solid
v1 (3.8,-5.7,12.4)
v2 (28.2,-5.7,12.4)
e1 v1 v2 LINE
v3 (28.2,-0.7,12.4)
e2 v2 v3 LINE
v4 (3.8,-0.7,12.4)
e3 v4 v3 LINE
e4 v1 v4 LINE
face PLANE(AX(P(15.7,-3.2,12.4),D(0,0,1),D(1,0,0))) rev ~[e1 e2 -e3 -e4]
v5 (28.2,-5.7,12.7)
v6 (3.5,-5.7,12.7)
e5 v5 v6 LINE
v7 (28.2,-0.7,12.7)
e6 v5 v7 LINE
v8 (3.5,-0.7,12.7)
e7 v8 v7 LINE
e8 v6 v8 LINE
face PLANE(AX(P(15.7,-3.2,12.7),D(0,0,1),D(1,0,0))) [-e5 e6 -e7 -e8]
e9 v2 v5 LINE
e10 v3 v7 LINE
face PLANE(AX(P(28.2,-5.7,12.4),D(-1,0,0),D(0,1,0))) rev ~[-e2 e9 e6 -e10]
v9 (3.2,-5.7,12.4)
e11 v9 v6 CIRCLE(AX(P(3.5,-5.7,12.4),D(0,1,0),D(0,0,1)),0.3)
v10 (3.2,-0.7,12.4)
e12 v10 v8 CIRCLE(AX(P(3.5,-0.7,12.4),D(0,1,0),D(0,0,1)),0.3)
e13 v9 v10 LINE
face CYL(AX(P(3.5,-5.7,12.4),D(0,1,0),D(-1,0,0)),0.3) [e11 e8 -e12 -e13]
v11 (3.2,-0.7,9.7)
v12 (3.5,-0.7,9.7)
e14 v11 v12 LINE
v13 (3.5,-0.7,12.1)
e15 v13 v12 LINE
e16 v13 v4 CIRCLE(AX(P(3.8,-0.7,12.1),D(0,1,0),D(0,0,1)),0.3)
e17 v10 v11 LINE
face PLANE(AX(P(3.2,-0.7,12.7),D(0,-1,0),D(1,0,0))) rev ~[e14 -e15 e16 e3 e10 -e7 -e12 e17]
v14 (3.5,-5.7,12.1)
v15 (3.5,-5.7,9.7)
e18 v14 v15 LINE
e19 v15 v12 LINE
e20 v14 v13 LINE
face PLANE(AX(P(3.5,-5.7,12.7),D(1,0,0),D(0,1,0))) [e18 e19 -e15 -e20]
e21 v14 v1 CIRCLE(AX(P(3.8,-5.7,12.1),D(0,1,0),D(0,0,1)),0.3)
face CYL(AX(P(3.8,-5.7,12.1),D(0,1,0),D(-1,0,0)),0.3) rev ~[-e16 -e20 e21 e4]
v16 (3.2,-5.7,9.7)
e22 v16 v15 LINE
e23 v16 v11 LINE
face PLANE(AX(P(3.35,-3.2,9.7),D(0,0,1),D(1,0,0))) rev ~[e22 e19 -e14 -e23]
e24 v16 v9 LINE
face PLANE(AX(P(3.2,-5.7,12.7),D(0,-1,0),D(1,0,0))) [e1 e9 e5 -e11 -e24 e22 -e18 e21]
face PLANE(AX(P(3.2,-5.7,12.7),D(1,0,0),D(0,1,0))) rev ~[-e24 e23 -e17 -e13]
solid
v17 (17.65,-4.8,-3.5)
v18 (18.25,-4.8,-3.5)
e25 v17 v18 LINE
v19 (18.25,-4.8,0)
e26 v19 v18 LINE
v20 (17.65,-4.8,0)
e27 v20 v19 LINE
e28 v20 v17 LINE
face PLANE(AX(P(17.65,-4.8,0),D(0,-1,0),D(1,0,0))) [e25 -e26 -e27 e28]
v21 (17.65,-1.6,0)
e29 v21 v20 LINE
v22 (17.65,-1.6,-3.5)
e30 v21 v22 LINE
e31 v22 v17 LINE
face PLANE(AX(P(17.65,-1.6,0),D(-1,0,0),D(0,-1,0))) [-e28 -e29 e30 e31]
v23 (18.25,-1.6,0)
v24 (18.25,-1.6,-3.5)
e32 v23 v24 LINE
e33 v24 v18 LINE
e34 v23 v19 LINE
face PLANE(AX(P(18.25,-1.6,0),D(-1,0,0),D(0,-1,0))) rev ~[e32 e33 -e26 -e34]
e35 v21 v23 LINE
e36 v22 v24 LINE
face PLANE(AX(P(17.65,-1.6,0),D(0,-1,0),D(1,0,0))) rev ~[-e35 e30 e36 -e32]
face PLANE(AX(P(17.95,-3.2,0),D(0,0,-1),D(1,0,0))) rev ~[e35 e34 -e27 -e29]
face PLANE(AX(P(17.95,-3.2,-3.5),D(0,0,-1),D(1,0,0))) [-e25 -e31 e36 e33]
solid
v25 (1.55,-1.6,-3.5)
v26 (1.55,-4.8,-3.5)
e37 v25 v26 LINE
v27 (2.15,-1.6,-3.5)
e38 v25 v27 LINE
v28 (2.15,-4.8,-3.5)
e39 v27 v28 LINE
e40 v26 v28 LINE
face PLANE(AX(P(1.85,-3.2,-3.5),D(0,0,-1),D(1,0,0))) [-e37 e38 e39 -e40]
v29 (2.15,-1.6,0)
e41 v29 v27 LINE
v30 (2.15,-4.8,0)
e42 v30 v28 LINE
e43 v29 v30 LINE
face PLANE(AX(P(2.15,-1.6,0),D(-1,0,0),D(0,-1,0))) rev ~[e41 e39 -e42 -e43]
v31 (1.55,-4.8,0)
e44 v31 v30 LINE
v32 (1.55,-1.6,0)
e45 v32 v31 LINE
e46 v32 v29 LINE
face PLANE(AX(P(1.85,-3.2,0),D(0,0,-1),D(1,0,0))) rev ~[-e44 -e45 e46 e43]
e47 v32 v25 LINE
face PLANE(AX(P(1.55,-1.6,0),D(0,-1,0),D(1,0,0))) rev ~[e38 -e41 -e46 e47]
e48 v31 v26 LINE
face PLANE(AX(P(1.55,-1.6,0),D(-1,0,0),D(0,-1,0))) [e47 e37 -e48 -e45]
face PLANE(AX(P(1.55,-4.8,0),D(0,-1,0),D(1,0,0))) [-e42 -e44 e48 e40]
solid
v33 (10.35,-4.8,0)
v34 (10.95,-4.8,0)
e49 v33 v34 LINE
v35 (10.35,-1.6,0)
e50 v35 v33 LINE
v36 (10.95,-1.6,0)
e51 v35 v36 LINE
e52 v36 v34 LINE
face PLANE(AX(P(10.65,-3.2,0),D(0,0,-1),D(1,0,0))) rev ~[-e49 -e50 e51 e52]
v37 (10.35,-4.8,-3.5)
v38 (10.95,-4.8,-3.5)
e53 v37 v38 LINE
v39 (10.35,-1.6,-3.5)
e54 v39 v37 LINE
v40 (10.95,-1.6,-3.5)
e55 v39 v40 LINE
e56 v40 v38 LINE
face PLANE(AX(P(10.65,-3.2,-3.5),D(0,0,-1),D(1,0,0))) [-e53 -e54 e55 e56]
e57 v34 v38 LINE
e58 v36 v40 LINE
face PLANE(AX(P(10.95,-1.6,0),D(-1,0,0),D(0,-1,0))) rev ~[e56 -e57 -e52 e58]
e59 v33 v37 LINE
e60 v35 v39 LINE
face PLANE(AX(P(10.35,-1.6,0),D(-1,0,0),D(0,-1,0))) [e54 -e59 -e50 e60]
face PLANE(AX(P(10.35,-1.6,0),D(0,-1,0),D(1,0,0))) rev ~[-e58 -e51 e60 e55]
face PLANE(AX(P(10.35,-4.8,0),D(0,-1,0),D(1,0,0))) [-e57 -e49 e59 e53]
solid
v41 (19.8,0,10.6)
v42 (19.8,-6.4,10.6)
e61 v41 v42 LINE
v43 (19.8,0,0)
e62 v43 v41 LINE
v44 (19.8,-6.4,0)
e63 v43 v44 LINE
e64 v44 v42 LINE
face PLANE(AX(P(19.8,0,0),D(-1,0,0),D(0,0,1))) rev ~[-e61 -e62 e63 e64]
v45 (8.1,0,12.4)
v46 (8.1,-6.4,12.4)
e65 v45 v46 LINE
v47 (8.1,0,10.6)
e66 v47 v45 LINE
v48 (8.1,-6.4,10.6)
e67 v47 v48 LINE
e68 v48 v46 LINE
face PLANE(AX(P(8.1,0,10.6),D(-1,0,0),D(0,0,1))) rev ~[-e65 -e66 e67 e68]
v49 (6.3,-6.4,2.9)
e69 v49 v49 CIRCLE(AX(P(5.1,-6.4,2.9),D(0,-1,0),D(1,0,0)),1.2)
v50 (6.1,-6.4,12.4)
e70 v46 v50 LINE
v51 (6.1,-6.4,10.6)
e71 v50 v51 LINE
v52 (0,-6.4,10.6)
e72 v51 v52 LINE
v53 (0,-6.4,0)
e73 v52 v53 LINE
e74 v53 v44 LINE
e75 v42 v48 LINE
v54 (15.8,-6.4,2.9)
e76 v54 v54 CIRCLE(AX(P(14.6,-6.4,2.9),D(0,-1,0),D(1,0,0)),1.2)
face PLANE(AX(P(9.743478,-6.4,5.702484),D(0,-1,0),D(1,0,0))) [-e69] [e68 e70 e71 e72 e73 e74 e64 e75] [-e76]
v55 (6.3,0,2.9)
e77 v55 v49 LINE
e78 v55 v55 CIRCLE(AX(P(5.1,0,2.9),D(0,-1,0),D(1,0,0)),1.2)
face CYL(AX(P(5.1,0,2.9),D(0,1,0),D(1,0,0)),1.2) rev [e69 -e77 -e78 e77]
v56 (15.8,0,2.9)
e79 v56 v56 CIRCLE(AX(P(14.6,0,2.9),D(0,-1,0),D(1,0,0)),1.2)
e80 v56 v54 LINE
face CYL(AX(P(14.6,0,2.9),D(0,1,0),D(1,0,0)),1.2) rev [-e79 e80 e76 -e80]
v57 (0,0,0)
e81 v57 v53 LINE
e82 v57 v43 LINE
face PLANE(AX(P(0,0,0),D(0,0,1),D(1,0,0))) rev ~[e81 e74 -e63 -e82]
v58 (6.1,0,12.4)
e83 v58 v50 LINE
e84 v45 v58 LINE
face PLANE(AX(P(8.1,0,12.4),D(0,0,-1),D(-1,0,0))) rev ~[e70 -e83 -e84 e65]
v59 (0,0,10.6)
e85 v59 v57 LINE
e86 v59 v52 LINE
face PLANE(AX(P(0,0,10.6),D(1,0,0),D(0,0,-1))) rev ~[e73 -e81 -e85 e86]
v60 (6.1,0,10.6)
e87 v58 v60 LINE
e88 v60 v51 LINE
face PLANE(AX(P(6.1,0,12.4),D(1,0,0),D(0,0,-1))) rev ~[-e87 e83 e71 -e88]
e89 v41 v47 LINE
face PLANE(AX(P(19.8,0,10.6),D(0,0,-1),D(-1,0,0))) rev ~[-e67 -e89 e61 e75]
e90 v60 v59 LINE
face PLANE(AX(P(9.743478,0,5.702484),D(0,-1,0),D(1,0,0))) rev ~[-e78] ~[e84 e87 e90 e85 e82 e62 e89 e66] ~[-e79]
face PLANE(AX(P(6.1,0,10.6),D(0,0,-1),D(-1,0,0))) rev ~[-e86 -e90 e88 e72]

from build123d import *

# Parameters (mm, degrees)
F0_R     = 1.2
F1_DEPTH = 6.4
F2_W     = 0.6
F2_H     = 3.2
F3_DEPTH = 3.5
F4_W     = 25
F4_H     = 5
F5_DEPTH = 0.3
F6_W     = 0.3
F6_H     = 5
F7_DEPTH = 3
F8_R     = 0.3


with BuildPart() as f1:
    # F0 (on Front) → F1 (new body)
    with BuildSketch(Plane.XZ):
        Polygon((0, 10.6), (0, 0), (19.8, 0), (19.8, 10.6), (8.1, 10.6), (8.1, 12.4), (6.1, 12.4), (6.1, 10.6), align=None)
        with Locations((5.1, 2.9)):
            Circle(F0_R, mode=Mode.SUBTRACT)
        with Locations((14.6, 2.9)):
            Circle(F0_R, mode=Mode.SUBTRACT)
    extrude(amount=F1_DEPTH)


with BuildPart() as f3:
    # F2 (on face) → F3 (new body)
    with BuildSketch(Plane(origin=(0, 0, 0), x_dir=(1, 0, 0), z_dir=(0, 0, -1))):
        with Locations((1.85, 3.2)):
            Rectangle(F2_W, F2_H)
    extrude(amount=F3_DEPTH)


with BuildPart() as f3b:
    # F2 (on face) → F3, piece 2 (new body)
    with BuildSketch(Plane(origin=(0, 0, 0), x_dir=(1, 0, 0), z_dir=(0, 0, -1))):
        with Locations((10.65, 3.2)):
            Rectangle(F2_W, F2_H)
    extrude(amount=F3_DEPTH)


with BuildPart() as f3c:
    # F2 (on face) → F3, piece 3 (new body)
    with BuildSketch(Plane(origin=(0, 0, 0), x_dir=(1, 0, 0), z_dir=(0, 0, -1))):
        with Locations((17.95, 3.2)):
            Rectangle(F2_W, F2_H)
    extrude(amount=F3_DEPTH)


with BuildPart() as f5:
    # F4 (on face) → F5 (new body)
    with BuildSketch(Plane.XY.offset(12.4)):
        with Locations((15.7, -3.2)):
            Rectangle(F4_W, F4_H)
    extrude(amount=F5_DEPTH)

    # F6 (on face) → F7 (join)
    with BuildSketch(Plane.XY.offset(12.7)):
        with Locations((3.35, -3.2)):
            Rectangle(F6_W, F6_H)
    extrude(amount=-F7_DEPTH)

    # F8
    f8_edges = [f5.edges().sort_by_distance(p)[0] for p in [
        (3.2, -3.2, 12.7),
        (3.5, -3.2, 12.4),
    ]]
    fillet(f8_edges, radius=F8_R)


solid = Compound([f1.part, f3.part, f3b.part, f3c.part, f5.part])
